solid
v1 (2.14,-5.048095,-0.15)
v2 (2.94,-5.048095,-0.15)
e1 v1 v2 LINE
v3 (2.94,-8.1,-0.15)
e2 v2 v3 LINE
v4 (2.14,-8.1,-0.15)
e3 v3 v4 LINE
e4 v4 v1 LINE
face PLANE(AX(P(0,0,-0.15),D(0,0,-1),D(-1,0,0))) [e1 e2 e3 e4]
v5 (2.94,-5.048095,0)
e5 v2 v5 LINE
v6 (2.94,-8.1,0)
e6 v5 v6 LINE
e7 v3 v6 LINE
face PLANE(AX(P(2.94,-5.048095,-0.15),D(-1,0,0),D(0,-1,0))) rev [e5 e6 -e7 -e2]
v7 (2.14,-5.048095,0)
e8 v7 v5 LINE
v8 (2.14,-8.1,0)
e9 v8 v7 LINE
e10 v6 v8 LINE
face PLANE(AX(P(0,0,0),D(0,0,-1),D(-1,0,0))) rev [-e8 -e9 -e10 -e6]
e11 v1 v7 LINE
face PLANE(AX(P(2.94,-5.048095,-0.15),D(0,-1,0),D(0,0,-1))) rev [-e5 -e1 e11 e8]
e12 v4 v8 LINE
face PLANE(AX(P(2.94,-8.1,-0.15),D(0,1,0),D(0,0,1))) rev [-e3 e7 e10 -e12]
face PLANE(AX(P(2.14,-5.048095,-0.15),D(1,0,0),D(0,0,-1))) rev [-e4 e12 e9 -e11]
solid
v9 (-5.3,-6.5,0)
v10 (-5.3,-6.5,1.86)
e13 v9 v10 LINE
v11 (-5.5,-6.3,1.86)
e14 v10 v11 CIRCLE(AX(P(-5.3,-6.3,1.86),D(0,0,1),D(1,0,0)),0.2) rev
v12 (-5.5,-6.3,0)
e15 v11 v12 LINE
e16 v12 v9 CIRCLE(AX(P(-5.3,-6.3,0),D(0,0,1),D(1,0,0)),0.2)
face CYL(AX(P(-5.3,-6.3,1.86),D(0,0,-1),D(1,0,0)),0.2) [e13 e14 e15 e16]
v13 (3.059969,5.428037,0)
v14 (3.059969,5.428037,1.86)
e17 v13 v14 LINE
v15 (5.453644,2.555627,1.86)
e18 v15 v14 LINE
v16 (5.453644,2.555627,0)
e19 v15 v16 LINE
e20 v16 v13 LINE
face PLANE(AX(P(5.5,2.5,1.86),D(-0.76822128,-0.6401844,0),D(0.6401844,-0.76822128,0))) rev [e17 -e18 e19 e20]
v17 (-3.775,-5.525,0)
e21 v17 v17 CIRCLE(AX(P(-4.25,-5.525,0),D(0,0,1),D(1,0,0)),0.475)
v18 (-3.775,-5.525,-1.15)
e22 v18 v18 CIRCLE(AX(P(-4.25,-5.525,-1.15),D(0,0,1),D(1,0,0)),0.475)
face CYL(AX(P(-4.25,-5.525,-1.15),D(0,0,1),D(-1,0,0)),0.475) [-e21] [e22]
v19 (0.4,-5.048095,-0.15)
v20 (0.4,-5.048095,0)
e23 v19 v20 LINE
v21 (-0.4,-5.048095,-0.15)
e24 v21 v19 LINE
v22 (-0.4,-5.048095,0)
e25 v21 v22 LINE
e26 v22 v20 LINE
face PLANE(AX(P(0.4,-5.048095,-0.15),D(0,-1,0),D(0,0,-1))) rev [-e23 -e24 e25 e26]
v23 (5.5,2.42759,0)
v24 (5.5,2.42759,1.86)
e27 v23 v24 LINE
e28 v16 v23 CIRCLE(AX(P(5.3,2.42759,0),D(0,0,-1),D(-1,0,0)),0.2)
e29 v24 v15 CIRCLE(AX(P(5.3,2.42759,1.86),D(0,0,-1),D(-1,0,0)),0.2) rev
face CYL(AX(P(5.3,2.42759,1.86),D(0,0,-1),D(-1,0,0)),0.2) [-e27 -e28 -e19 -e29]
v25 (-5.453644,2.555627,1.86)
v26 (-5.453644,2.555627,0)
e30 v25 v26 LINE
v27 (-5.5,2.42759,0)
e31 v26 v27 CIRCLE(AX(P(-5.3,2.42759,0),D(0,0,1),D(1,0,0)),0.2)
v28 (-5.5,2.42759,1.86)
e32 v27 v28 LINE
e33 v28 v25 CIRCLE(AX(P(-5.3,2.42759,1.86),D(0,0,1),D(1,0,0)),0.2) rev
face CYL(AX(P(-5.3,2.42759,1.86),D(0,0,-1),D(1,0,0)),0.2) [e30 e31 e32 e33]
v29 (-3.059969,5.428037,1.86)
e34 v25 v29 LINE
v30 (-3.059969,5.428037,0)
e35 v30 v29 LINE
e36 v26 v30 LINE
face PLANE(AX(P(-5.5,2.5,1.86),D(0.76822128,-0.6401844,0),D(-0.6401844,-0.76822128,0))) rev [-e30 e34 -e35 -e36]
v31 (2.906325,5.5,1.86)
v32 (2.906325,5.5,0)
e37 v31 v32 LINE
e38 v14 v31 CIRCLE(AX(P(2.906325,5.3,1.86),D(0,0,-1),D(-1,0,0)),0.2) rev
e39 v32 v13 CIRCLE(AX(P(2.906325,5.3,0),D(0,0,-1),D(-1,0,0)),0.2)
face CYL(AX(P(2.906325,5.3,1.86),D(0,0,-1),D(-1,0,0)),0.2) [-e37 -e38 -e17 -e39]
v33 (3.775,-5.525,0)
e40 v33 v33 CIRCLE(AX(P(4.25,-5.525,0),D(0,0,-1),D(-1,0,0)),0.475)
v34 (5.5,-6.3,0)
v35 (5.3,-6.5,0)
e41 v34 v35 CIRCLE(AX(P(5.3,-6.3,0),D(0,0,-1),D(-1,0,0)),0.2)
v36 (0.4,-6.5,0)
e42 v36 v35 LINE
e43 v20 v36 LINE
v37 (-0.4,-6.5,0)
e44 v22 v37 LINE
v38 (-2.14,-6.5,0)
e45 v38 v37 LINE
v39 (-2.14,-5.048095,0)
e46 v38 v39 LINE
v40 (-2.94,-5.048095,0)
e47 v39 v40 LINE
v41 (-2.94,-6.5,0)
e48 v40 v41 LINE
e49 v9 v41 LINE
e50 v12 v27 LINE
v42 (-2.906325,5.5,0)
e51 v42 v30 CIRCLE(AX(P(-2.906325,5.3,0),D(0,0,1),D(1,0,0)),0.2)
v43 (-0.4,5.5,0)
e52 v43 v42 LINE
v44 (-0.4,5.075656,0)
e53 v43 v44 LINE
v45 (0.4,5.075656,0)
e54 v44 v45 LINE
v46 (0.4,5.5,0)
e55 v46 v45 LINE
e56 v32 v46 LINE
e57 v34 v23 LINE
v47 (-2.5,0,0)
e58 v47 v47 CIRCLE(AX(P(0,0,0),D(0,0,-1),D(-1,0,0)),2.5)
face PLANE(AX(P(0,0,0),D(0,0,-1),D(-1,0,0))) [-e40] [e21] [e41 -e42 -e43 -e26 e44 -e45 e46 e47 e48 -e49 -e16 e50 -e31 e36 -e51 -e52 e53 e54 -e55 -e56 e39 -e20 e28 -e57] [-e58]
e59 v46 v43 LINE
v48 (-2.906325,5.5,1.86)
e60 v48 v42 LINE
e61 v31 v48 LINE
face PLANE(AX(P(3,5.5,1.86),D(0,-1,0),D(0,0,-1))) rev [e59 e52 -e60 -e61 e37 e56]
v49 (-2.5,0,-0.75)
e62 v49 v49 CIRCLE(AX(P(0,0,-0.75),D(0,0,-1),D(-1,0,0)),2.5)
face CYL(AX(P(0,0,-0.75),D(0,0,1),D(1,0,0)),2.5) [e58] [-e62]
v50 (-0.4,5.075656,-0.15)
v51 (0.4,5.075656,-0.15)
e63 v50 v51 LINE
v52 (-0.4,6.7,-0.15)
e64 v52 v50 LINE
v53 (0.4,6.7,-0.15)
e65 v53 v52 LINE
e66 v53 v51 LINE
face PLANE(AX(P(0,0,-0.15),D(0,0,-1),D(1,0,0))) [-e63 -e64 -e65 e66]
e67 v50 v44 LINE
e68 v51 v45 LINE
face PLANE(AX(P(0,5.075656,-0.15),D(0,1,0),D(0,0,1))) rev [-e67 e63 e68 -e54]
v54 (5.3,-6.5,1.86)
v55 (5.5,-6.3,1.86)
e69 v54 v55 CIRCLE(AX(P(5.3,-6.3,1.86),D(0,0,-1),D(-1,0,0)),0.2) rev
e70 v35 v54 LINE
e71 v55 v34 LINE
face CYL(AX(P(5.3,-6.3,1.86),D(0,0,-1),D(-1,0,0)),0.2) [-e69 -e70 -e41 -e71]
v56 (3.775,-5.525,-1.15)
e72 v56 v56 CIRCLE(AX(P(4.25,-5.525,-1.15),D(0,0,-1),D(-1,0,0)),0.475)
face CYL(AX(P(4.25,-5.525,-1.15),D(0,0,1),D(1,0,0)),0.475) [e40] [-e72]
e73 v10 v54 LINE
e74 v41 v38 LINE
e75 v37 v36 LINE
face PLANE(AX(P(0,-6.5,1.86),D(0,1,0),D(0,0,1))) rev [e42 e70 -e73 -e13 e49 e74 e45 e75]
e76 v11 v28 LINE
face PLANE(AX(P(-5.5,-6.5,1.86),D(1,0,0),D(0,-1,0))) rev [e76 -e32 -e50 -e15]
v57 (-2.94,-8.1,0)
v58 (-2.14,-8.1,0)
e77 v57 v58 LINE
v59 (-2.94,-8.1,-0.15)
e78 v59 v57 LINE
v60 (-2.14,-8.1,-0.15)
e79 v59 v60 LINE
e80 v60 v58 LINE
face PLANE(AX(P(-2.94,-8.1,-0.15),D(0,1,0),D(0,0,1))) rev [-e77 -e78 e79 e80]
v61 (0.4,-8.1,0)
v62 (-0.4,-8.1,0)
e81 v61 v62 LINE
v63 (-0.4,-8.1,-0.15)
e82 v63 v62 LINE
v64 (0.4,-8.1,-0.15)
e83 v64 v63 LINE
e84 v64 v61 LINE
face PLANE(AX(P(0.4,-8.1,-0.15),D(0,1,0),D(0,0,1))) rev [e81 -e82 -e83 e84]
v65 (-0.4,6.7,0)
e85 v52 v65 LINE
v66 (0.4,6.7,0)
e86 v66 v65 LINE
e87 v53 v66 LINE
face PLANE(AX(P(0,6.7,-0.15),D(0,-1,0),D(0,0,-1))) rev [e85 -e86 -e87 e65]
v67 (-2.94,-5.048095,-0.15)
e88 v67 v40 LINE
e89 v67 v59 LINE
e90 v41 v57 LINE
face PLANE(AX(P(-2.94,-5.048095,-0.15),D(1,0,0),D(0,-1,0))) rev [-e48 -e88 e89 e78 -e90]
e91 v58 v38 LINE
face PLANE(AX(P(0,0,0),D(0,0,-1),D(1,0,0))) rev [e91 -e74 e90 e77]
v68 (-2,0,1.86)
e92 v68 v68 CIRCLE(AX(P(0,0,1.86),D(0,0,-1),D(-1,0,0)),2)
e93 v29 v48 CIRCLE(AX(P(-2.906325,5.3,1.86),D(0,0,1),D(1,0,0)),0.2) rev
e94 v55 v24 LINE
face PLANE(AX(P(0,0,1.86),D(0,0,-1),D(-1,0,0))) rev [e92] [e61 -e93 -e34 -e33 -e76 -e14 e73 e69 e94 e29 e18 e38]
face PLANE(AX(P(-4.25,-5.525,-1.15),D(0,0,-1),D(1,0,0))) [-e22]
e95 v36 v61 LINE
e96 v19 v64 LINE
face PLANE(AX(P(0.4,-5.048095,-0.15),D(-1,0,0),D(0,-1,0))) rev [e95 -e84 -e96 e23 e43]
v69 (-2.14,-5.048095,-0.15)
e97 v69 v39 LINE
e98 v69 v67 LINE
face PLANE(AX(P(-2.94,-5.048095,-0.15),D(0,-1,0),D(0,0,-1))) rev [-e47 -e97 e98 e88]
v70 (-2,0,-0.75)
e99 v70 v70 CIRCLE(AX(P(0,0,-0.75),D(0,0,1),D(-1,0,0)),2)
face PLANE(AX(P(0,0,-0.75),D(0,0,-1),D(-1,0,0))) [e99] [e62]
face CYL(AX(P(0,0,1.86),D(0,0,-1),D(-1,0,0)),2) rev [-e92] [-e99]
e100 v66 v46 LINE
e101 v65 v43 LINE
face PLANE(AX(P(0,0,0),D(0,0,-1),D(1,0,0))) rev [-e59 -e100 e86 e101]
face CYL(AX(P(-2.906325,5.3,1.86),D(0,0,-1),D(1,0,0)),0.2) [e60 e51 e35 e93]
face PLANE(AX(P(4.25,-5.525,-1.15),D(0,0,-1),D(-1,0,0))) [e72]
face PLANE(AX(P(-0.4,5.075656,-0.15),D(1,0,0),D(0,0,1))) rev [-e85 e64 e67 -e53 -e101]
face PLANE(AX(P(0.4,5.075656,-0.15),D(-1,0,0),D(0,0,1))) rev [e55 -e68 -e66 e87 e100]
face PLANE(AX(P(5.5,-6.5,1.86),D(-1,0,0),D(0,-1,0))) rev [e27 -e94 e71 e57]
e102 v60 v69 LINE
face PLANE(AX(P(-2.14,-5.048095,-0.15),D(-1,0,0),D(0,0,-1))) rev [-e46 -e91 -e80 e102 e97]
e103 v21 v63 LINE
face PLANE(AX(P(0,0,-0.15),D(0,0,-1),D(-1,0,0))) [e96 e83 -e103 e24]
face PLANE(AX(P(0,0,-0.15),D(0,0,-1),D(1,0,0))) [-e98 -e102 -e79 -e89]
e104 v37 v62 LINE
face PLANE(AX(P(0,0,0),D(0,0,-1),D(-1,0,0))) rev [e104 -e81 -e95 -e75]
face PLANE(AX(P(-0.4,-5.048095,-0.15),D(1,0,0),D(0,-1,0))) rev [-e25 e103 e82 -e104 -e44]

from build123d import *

# Parameters (mm, degrees)
SALIENTE_EXTRUIR1_DEPTH   = 1.86
CROQUIS2_R                = 0.475
SALIENTE_EXTRUIR2_DEPTH   = 1.15
SALIENTE_EXTRUIR3_START   = 0.75
SALIENTE_EXTRUIR3_DEPTH   = 0.75
CROQUIS4_W                = 0.4
CROQUIS4_H                = 1.624344129
SALIENTE_EXTRUIR4_DEPTH   = 0.15
CROQUIS4_W_2              = 0.8
CROQUIS4_H_2              = 3.051904831
SALIENTE_EXTRUIR4_2_DEPTH = 0.15
SALIENTE_EXTRUIR4_3_DEPTH = 0.15
REDONDEO1_R               = 0.2
SIMETR_A1_DEPTH           = 1.86
SIMETR_A1_START           = -0.75
SIMETR_A1_2_OUTLINE_R     = 0.475
SIMETR_A1_2_DEPTH         = 0.75
SIMETR_A1_START_2         = -1.15
SIMETR_A1_3_OUTLINE_R     = 0.475
SIMETR_A1_3_DEPTH         = 0.4


# Read off the part's stored shape, not the designer's step: Simetría1
with BuildPart() as part:
    # Croquis1 → Saliente-Extruir1 (new body)
    with BuildSketch(Plane.XY):
        with BuildLine():
            Line((5.5, -6.5), (5.5, 2.5))
            Line((5.5, 2.5), (3, 5.5))
            Line((3, 5.5), (0, 5.5))
            Line((0, 5.5), (0, 2))
            ThreePointArc((0, 2), (2, 0), (0, -2))
            Line((0, -2), (0, -6.5))
            Line((0, -6.5), (5.5, -6.5))
        make_face()
    extrude(amount=SALIENTE_EXTRUIR1_DEPTH)

    # Croquis2 → Saliente-Extruir2 (add)
    with BuildSketch(Plane(origin=(0, 0, 0), x_dir=(-1, 0, 0), z_dir=(0, 0, -1))):
        with Locations((-4.25, -5.525)):
            Circle(CROQUIS2_R)
    extrude(amount=SALIENTE_EXTRUIR2_DEPTH)

    # Croquis3 → Saliente-Extruir3 (add)
    with BuildSketch(Plane(origin=(0, 0, 0), x_dir=(-1, 0, 0), z_dir=(0, 0, -1)).offset(SALIENTE_EXTRUIR3_START)):
        with BuildLine():
            Line((0, 2.5), (0, 2))
            ThreePointArc((0, 2), (-2, 0), (0, -2))
            Line((0, -2), (0, -2.5))
            ThreePointArc((0, -2.5), (-2.5, 0), (0, 2.5))
        make_face()
    extrude(amount=-SALIENTE_EXTRUIR3_DEPTH)

    # Redondeo1
    redondeo1_edges = [part.edges().sort_by_distance(p)[0] for p in [
        (3, 5.5, 0.93),
        (5.5, 2.5, 0.93),
        (5.5, -6.5, 0.93),
    ]]
    fillet(redondeo1_edges, radius=REDONDEO1_R)

    # Simetría1 outline → Simetría1 (add)
    with BuildSketch(Plane.XY):
        with BuildLine():
            ThreePointArc((0, -2), (-2, 0), (0, 2))
            Line((0, 2), (0, 5.5))
            Line((0, 5.5), (-2.906325011, 5.5))
            ThreePointArc((-2.906325011, 5.5), (-2.99115609, 5.481117884), (-3.059969267, 5.42803688))
            Line((-3.059969267, 5.42803688), (-5.453644256, 2.555626893))
            ThreePointArc((-5.453644256, 2.555626893), (-5.488054316, 2.495675066), (-5.5, 2.427590013))
            Line((-5.5, 2.427590013), (-5.5, -6.3))
            ThreePointArc((-5.5, -6.3), (-5.441421356, -6.441421356), (-5.3, -6.5))
            Line((-5.3, -6.5), (0, -6.5))
            Line((0, -6.5), (0, -2))
        make_face()
    extrude(amount=SIMETR_A1_DEPTH)

    # Simetr_a1 2 outline → Simetr_a1 2 (add)
    with BuildSketch(Plane.XY.offset(SIMETR_A1_START)):
        with BuildLine():
            ThreePointArc((0, -2), (-2, 0), (0, 2))
            Line((0, 2), (0, 2.5))
            ThreePointArc((0, 2.5), (-2.5, 0), (0, -2.5))
            Line((0, -2.5), (0, -2))
        make_face()
        with Locations((-4.25, -5.525)):
            Circle(SIMETR_A1_2_OUTLINE_R)
    extrude(amount=SIMETR_A1_2_DEPTH)

    # Simetr_a1 3 outline → Simetr_a1 3 (add)
    with BuildSketch(Plane.XY.offset(SIMETR_A1_START_2)):
        with Locations((-4.25, -5.525)):
            Circle(SIMETR_A1_3_OUTLINE_R)
    extrude(amount=SIMETR_A1_3_DEPTH)


with BuildPart() as body_2:
    # Croquis4 → Saliente-Extruir4 (new body)
    with BuildSketch(Plane(origin=(0, 0, 0), x_dir=(-1, 0, 0), z_dir=(0, 0, -1))):
        with Locations((-0.2, 5.887827936)):
            Rectangle(CROQUIS4_W, CROQUIS4_H)
    saliente_extruir4 = extrude(amount=SALIENTE_EXTRUIR4_DEPTH)


with BuildPart() as body_3:
    # Croquis4 → Saliente-Extruir4 2 (new body)
    with BuildSketch(Plane(origin=(0, 0, 0), x_dir=(-1, 0, 0), z_dir=(0, 0, -1))):
        with Locations((-2.54, -6.574047585)):
            Rectangle(CROQUIS4_W_2, CROQUIS4_H_2)
    saliente_extruir4_2 = extrude(amount=SALIENTE_EXTRUIR4_2_DEPTH)


with BuildPart() as body_4:
    # Croquis4 → Saliente-Extruir4 3 (new body)
    with BuildSketch(Plane(origin=(0, 0, 0), x_dir=(-1, 0, 0), z_dir=(0, 0, -1))):
        with Locations((-0.2, -6.574047585)):
            Rectangle(CROQUIS4_W, CROQUIS4_H_2)
    saliente_extruir4_3 = extrude(amount=SALIENTE_EXTRUIR4_3_DEPTH)


with BuildPart() as part_1:
    add(part.part)

    add(body_2.part)  # Simetría2 merges body 2

    add(body_4.part)  # Simetría2 merges body 4
    # Simetría2: Saliente-Extruir4, Saliente-Extruir4 2, Saliente-Extruir4 3 across plane
    add(saliente_extruir4.mirror(Plane(origin=(0, 0, 0), x_dir=(0, 0, 1), z_dir=(1, 0, 0))))
    add(saliente_extruir4_2.mirror(Plane(origin=(0, 0, 0), x_dir=(0, 0, 1), z_dir=(1, 0, 0))))
    add(saliente_extruir4_3.mirror(Plane(origin=(0, 0, 0), x_dir=(0, 0, 1), z_dir=(1, 0, 0))))


solid = Compound([body_3.part, part_1.part])
